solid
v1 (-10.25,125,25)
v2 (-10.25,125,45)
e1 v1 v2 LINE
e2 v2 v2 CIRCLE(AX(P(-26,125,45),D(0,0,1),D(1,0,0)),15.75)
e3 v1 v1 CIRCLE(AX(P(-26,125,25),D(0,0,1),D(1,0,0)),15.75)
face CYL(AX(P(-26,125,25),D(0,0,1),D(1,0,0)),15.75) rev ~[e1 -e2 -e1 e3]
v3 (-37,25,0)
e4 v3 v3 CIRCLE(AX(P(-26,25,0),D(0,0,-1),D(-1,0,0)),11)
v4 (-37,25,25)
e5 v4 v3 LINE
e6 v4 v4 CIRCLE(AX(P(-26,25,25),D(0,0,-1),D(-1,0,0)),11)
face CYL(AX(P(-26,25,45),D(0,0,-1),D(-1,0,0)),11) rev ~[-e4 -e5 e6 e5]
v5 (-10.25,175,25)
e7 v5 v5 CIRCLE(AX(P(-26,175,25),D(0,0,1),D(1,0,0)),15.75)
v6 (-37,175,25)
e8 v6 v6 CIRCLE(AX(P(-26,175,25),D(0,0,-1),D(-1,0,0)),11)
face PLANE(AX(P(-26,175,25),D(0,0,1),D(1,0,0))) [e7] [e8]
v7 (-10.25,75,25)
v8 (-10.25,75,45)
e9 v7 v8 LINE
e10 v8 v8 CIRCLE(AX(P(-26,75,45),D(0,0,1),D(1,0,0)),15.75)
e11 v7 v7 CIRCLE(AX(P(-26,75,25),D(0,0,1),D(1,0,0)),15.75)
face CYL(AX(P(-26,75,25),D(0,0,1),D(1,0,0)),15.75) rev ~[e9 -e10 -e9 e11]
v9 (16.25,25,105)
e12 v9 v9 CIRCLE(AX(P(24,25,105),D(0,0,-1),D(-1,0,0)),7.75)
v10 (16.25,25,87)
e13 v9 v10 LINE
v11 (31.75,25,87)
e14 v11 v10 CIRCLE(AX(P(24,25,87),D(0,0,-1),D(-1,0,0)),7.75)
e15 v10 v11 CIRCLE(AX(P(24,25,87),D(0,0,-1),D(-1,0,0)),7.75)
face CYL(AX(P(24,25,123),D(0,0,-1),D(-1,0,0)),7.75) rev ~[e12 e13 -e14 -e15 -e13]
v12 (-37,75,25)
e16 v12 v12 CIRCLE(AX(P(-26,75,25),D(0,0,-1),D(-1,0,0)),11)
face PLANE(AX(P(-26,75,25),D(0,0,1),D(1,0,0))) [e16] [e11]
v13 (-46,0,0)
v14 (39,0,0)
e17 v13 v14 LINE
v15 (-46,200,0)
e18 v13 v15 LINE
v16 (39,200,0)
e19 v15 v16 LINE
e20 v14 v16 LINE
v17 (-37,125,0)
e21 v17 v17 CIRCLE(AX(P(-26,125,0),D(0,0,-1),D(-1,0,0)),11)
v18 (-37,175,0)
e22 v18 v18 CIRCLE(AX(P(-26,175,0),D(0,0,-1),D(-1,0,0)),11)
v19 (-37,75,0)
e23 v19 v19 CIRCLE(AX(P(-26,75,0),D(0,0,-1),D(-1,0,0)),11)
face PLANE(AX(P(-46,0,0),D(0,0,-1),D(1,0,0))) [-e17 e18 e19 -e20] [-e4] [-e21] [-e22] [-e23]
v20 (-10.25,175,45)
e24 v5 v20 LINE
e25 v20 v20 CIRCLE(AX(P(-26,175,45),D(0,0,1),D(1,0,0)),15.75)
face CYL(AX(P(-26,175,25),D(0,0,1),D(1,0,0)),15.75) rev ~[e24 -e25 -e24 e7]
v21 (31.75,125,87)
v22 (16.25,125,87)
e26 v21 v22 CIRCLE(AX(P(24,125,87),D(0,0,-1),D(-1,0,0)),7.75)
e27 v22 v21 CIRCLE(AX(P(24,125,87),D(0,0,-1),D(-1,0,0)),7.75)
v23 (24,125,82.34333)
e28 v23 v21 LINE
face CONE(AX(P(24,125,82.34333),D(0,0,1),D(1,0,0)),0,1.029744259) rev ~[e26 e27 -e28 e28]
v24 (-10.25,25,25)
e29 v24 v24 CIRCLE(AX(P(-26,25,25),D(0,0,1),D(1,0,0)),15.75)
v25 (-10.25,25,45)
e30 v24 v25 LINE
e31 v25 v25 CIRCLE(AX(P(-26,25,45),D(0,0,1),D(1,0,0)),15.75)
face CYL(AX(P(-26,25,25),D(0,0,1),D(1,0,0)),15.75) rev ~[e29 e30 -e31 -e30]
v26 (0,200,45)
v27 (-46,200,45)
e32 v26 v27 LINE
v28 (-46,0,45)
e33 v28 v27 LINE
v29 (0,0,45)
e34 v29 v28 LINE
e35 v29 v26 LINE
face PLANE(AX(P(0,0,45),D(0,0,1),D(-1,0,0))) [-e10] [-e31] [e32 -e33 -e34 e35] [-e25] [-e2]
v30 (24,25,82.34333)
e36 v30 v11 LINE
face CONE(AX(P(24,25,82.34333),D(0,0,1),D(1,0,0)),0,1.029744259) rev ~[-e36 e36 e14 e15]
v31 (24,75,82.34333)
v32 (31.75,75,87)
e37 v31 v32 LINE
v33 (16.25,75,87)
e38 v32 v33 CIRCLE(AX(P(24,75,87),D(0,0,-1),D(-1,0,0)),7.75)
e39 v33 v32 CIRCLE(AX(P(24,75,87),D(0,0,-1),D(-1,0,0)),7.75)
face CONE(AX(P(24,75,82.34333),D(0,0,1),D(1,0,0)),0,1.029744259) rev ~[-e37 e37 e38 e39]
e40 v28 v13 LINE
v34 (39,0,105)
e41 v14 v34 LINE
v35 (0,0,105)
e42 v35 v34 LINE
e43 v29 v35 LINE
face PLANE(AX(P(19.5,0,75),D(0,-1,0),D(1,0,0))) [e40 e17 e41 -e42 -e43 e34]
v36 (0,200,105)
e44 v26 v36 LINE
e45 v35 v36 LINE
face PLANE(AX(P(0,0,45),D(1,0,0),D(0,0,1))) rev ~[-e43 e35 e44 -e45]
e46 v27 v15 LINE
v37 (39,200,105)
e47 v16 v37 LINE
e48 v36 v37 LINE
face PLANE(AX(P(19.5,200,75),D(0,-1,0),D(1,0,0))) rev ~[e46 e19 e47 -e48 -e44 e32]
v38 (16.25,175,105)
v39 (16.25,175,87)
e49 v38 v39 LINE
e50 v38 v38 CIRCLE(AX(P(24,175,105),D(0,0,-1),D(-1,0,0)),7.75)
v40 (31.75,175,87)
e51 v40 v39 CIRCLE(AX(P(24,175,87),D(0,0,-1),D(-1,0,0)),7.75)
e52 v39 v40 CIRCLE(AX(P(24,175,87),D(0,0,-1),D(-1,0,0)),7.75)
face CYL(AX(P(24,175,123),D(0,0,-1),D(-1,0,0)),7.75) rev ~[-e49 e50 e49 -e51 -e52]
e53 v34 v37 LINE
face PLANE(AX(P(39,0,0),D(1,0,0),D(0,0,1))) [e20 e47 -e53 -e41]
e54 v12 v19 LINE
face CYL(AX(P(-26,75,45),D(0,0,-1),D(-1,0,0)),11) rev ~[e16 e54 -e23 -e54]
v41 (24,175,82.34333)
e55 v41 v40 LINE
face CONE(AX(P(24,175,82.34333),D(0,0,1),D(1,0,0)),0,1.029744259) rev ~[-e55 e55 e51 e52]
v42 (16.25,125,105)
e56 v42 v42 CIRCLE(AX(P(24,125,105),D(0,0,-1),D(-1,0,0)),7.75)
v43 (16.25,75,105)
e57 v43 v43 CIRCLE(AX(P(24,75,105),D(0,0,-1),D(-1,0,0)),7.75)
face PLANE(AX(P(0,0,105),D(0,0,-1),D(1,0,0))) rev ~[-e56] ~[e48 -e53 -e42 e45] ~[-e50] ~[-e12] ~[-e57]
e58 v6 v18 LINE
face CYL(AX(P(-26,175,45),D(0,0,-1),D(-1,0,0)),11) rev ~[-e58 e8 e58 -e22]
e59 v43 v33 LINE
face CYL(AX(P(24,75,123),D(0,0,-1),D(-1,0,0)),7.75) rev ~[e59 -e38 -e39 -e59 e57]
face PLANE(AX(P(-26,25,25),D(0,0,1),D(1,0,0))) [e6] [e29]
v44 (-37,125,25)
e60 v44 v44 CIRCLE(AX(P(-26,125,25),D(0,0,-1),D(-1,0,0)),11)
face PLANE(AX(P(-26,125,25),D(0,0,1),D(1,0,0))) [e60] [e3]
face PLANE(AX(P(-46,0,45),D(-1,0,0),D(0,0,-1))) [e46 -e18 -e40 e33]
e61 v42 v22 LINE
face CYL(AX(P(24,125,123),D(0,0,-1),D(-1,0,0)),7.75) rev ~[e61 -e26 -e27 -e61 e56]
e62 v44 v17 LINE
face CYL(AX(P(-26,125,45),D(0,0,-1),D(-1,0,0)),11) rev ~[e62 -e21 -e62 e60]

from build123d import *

# Parameters (mm, degrees)
F0_W           = 39
F0_H           = 60
F1_DEPTH       = 200
F4_D           = 15.5
F4_DEPTH       = 18
F4_TIP         = 4.6566697975
F5_D           = 22
F5_CBORE_D     = 31.5
F5_CBORE_DEPTH = 20


# Not quite as in the source:
# - a feature names something its author has since deleted; it is built from what else it names


with BuildPart() as f1:
    # F0 (on Front) → F1 (new body)
    with BuildSketch(Plane.XZ):
        with Locations((19.5, 75)):
            Rectangle(F0_W, F0_H)
        Polygon((0, 45), (-46, 45), (-46, 0), (39, 0), (39, 45), align=None)
    extrude(amount=-F1_DEPTH)

    # F4
    with Locations(Plane.XY.offset(105)):
        with Locations((24, 25), (24, 75), (24, 125), (24, 175)):
            Hole(F4_D / 2, depth=F4_DEPTH)
            with Locations((0, 0, -(F4_DEPTH + F4_TIP / 2))):  # 118° drill point
                Cone(0, F4_D / 2, F4_TIP, mode=Mode.SUBTRACT)

    # F5 (through all)
    with Locations(Plane.XY.offset(45)):
        with Locations((-26, 25), (-26, 75), (-26, 125), (-26, 175)):
            CounterBoreHole(F5_D / 2, F5_CBORE_D / 2, F5_CBORE_DEPTH)


solid = f1.part
